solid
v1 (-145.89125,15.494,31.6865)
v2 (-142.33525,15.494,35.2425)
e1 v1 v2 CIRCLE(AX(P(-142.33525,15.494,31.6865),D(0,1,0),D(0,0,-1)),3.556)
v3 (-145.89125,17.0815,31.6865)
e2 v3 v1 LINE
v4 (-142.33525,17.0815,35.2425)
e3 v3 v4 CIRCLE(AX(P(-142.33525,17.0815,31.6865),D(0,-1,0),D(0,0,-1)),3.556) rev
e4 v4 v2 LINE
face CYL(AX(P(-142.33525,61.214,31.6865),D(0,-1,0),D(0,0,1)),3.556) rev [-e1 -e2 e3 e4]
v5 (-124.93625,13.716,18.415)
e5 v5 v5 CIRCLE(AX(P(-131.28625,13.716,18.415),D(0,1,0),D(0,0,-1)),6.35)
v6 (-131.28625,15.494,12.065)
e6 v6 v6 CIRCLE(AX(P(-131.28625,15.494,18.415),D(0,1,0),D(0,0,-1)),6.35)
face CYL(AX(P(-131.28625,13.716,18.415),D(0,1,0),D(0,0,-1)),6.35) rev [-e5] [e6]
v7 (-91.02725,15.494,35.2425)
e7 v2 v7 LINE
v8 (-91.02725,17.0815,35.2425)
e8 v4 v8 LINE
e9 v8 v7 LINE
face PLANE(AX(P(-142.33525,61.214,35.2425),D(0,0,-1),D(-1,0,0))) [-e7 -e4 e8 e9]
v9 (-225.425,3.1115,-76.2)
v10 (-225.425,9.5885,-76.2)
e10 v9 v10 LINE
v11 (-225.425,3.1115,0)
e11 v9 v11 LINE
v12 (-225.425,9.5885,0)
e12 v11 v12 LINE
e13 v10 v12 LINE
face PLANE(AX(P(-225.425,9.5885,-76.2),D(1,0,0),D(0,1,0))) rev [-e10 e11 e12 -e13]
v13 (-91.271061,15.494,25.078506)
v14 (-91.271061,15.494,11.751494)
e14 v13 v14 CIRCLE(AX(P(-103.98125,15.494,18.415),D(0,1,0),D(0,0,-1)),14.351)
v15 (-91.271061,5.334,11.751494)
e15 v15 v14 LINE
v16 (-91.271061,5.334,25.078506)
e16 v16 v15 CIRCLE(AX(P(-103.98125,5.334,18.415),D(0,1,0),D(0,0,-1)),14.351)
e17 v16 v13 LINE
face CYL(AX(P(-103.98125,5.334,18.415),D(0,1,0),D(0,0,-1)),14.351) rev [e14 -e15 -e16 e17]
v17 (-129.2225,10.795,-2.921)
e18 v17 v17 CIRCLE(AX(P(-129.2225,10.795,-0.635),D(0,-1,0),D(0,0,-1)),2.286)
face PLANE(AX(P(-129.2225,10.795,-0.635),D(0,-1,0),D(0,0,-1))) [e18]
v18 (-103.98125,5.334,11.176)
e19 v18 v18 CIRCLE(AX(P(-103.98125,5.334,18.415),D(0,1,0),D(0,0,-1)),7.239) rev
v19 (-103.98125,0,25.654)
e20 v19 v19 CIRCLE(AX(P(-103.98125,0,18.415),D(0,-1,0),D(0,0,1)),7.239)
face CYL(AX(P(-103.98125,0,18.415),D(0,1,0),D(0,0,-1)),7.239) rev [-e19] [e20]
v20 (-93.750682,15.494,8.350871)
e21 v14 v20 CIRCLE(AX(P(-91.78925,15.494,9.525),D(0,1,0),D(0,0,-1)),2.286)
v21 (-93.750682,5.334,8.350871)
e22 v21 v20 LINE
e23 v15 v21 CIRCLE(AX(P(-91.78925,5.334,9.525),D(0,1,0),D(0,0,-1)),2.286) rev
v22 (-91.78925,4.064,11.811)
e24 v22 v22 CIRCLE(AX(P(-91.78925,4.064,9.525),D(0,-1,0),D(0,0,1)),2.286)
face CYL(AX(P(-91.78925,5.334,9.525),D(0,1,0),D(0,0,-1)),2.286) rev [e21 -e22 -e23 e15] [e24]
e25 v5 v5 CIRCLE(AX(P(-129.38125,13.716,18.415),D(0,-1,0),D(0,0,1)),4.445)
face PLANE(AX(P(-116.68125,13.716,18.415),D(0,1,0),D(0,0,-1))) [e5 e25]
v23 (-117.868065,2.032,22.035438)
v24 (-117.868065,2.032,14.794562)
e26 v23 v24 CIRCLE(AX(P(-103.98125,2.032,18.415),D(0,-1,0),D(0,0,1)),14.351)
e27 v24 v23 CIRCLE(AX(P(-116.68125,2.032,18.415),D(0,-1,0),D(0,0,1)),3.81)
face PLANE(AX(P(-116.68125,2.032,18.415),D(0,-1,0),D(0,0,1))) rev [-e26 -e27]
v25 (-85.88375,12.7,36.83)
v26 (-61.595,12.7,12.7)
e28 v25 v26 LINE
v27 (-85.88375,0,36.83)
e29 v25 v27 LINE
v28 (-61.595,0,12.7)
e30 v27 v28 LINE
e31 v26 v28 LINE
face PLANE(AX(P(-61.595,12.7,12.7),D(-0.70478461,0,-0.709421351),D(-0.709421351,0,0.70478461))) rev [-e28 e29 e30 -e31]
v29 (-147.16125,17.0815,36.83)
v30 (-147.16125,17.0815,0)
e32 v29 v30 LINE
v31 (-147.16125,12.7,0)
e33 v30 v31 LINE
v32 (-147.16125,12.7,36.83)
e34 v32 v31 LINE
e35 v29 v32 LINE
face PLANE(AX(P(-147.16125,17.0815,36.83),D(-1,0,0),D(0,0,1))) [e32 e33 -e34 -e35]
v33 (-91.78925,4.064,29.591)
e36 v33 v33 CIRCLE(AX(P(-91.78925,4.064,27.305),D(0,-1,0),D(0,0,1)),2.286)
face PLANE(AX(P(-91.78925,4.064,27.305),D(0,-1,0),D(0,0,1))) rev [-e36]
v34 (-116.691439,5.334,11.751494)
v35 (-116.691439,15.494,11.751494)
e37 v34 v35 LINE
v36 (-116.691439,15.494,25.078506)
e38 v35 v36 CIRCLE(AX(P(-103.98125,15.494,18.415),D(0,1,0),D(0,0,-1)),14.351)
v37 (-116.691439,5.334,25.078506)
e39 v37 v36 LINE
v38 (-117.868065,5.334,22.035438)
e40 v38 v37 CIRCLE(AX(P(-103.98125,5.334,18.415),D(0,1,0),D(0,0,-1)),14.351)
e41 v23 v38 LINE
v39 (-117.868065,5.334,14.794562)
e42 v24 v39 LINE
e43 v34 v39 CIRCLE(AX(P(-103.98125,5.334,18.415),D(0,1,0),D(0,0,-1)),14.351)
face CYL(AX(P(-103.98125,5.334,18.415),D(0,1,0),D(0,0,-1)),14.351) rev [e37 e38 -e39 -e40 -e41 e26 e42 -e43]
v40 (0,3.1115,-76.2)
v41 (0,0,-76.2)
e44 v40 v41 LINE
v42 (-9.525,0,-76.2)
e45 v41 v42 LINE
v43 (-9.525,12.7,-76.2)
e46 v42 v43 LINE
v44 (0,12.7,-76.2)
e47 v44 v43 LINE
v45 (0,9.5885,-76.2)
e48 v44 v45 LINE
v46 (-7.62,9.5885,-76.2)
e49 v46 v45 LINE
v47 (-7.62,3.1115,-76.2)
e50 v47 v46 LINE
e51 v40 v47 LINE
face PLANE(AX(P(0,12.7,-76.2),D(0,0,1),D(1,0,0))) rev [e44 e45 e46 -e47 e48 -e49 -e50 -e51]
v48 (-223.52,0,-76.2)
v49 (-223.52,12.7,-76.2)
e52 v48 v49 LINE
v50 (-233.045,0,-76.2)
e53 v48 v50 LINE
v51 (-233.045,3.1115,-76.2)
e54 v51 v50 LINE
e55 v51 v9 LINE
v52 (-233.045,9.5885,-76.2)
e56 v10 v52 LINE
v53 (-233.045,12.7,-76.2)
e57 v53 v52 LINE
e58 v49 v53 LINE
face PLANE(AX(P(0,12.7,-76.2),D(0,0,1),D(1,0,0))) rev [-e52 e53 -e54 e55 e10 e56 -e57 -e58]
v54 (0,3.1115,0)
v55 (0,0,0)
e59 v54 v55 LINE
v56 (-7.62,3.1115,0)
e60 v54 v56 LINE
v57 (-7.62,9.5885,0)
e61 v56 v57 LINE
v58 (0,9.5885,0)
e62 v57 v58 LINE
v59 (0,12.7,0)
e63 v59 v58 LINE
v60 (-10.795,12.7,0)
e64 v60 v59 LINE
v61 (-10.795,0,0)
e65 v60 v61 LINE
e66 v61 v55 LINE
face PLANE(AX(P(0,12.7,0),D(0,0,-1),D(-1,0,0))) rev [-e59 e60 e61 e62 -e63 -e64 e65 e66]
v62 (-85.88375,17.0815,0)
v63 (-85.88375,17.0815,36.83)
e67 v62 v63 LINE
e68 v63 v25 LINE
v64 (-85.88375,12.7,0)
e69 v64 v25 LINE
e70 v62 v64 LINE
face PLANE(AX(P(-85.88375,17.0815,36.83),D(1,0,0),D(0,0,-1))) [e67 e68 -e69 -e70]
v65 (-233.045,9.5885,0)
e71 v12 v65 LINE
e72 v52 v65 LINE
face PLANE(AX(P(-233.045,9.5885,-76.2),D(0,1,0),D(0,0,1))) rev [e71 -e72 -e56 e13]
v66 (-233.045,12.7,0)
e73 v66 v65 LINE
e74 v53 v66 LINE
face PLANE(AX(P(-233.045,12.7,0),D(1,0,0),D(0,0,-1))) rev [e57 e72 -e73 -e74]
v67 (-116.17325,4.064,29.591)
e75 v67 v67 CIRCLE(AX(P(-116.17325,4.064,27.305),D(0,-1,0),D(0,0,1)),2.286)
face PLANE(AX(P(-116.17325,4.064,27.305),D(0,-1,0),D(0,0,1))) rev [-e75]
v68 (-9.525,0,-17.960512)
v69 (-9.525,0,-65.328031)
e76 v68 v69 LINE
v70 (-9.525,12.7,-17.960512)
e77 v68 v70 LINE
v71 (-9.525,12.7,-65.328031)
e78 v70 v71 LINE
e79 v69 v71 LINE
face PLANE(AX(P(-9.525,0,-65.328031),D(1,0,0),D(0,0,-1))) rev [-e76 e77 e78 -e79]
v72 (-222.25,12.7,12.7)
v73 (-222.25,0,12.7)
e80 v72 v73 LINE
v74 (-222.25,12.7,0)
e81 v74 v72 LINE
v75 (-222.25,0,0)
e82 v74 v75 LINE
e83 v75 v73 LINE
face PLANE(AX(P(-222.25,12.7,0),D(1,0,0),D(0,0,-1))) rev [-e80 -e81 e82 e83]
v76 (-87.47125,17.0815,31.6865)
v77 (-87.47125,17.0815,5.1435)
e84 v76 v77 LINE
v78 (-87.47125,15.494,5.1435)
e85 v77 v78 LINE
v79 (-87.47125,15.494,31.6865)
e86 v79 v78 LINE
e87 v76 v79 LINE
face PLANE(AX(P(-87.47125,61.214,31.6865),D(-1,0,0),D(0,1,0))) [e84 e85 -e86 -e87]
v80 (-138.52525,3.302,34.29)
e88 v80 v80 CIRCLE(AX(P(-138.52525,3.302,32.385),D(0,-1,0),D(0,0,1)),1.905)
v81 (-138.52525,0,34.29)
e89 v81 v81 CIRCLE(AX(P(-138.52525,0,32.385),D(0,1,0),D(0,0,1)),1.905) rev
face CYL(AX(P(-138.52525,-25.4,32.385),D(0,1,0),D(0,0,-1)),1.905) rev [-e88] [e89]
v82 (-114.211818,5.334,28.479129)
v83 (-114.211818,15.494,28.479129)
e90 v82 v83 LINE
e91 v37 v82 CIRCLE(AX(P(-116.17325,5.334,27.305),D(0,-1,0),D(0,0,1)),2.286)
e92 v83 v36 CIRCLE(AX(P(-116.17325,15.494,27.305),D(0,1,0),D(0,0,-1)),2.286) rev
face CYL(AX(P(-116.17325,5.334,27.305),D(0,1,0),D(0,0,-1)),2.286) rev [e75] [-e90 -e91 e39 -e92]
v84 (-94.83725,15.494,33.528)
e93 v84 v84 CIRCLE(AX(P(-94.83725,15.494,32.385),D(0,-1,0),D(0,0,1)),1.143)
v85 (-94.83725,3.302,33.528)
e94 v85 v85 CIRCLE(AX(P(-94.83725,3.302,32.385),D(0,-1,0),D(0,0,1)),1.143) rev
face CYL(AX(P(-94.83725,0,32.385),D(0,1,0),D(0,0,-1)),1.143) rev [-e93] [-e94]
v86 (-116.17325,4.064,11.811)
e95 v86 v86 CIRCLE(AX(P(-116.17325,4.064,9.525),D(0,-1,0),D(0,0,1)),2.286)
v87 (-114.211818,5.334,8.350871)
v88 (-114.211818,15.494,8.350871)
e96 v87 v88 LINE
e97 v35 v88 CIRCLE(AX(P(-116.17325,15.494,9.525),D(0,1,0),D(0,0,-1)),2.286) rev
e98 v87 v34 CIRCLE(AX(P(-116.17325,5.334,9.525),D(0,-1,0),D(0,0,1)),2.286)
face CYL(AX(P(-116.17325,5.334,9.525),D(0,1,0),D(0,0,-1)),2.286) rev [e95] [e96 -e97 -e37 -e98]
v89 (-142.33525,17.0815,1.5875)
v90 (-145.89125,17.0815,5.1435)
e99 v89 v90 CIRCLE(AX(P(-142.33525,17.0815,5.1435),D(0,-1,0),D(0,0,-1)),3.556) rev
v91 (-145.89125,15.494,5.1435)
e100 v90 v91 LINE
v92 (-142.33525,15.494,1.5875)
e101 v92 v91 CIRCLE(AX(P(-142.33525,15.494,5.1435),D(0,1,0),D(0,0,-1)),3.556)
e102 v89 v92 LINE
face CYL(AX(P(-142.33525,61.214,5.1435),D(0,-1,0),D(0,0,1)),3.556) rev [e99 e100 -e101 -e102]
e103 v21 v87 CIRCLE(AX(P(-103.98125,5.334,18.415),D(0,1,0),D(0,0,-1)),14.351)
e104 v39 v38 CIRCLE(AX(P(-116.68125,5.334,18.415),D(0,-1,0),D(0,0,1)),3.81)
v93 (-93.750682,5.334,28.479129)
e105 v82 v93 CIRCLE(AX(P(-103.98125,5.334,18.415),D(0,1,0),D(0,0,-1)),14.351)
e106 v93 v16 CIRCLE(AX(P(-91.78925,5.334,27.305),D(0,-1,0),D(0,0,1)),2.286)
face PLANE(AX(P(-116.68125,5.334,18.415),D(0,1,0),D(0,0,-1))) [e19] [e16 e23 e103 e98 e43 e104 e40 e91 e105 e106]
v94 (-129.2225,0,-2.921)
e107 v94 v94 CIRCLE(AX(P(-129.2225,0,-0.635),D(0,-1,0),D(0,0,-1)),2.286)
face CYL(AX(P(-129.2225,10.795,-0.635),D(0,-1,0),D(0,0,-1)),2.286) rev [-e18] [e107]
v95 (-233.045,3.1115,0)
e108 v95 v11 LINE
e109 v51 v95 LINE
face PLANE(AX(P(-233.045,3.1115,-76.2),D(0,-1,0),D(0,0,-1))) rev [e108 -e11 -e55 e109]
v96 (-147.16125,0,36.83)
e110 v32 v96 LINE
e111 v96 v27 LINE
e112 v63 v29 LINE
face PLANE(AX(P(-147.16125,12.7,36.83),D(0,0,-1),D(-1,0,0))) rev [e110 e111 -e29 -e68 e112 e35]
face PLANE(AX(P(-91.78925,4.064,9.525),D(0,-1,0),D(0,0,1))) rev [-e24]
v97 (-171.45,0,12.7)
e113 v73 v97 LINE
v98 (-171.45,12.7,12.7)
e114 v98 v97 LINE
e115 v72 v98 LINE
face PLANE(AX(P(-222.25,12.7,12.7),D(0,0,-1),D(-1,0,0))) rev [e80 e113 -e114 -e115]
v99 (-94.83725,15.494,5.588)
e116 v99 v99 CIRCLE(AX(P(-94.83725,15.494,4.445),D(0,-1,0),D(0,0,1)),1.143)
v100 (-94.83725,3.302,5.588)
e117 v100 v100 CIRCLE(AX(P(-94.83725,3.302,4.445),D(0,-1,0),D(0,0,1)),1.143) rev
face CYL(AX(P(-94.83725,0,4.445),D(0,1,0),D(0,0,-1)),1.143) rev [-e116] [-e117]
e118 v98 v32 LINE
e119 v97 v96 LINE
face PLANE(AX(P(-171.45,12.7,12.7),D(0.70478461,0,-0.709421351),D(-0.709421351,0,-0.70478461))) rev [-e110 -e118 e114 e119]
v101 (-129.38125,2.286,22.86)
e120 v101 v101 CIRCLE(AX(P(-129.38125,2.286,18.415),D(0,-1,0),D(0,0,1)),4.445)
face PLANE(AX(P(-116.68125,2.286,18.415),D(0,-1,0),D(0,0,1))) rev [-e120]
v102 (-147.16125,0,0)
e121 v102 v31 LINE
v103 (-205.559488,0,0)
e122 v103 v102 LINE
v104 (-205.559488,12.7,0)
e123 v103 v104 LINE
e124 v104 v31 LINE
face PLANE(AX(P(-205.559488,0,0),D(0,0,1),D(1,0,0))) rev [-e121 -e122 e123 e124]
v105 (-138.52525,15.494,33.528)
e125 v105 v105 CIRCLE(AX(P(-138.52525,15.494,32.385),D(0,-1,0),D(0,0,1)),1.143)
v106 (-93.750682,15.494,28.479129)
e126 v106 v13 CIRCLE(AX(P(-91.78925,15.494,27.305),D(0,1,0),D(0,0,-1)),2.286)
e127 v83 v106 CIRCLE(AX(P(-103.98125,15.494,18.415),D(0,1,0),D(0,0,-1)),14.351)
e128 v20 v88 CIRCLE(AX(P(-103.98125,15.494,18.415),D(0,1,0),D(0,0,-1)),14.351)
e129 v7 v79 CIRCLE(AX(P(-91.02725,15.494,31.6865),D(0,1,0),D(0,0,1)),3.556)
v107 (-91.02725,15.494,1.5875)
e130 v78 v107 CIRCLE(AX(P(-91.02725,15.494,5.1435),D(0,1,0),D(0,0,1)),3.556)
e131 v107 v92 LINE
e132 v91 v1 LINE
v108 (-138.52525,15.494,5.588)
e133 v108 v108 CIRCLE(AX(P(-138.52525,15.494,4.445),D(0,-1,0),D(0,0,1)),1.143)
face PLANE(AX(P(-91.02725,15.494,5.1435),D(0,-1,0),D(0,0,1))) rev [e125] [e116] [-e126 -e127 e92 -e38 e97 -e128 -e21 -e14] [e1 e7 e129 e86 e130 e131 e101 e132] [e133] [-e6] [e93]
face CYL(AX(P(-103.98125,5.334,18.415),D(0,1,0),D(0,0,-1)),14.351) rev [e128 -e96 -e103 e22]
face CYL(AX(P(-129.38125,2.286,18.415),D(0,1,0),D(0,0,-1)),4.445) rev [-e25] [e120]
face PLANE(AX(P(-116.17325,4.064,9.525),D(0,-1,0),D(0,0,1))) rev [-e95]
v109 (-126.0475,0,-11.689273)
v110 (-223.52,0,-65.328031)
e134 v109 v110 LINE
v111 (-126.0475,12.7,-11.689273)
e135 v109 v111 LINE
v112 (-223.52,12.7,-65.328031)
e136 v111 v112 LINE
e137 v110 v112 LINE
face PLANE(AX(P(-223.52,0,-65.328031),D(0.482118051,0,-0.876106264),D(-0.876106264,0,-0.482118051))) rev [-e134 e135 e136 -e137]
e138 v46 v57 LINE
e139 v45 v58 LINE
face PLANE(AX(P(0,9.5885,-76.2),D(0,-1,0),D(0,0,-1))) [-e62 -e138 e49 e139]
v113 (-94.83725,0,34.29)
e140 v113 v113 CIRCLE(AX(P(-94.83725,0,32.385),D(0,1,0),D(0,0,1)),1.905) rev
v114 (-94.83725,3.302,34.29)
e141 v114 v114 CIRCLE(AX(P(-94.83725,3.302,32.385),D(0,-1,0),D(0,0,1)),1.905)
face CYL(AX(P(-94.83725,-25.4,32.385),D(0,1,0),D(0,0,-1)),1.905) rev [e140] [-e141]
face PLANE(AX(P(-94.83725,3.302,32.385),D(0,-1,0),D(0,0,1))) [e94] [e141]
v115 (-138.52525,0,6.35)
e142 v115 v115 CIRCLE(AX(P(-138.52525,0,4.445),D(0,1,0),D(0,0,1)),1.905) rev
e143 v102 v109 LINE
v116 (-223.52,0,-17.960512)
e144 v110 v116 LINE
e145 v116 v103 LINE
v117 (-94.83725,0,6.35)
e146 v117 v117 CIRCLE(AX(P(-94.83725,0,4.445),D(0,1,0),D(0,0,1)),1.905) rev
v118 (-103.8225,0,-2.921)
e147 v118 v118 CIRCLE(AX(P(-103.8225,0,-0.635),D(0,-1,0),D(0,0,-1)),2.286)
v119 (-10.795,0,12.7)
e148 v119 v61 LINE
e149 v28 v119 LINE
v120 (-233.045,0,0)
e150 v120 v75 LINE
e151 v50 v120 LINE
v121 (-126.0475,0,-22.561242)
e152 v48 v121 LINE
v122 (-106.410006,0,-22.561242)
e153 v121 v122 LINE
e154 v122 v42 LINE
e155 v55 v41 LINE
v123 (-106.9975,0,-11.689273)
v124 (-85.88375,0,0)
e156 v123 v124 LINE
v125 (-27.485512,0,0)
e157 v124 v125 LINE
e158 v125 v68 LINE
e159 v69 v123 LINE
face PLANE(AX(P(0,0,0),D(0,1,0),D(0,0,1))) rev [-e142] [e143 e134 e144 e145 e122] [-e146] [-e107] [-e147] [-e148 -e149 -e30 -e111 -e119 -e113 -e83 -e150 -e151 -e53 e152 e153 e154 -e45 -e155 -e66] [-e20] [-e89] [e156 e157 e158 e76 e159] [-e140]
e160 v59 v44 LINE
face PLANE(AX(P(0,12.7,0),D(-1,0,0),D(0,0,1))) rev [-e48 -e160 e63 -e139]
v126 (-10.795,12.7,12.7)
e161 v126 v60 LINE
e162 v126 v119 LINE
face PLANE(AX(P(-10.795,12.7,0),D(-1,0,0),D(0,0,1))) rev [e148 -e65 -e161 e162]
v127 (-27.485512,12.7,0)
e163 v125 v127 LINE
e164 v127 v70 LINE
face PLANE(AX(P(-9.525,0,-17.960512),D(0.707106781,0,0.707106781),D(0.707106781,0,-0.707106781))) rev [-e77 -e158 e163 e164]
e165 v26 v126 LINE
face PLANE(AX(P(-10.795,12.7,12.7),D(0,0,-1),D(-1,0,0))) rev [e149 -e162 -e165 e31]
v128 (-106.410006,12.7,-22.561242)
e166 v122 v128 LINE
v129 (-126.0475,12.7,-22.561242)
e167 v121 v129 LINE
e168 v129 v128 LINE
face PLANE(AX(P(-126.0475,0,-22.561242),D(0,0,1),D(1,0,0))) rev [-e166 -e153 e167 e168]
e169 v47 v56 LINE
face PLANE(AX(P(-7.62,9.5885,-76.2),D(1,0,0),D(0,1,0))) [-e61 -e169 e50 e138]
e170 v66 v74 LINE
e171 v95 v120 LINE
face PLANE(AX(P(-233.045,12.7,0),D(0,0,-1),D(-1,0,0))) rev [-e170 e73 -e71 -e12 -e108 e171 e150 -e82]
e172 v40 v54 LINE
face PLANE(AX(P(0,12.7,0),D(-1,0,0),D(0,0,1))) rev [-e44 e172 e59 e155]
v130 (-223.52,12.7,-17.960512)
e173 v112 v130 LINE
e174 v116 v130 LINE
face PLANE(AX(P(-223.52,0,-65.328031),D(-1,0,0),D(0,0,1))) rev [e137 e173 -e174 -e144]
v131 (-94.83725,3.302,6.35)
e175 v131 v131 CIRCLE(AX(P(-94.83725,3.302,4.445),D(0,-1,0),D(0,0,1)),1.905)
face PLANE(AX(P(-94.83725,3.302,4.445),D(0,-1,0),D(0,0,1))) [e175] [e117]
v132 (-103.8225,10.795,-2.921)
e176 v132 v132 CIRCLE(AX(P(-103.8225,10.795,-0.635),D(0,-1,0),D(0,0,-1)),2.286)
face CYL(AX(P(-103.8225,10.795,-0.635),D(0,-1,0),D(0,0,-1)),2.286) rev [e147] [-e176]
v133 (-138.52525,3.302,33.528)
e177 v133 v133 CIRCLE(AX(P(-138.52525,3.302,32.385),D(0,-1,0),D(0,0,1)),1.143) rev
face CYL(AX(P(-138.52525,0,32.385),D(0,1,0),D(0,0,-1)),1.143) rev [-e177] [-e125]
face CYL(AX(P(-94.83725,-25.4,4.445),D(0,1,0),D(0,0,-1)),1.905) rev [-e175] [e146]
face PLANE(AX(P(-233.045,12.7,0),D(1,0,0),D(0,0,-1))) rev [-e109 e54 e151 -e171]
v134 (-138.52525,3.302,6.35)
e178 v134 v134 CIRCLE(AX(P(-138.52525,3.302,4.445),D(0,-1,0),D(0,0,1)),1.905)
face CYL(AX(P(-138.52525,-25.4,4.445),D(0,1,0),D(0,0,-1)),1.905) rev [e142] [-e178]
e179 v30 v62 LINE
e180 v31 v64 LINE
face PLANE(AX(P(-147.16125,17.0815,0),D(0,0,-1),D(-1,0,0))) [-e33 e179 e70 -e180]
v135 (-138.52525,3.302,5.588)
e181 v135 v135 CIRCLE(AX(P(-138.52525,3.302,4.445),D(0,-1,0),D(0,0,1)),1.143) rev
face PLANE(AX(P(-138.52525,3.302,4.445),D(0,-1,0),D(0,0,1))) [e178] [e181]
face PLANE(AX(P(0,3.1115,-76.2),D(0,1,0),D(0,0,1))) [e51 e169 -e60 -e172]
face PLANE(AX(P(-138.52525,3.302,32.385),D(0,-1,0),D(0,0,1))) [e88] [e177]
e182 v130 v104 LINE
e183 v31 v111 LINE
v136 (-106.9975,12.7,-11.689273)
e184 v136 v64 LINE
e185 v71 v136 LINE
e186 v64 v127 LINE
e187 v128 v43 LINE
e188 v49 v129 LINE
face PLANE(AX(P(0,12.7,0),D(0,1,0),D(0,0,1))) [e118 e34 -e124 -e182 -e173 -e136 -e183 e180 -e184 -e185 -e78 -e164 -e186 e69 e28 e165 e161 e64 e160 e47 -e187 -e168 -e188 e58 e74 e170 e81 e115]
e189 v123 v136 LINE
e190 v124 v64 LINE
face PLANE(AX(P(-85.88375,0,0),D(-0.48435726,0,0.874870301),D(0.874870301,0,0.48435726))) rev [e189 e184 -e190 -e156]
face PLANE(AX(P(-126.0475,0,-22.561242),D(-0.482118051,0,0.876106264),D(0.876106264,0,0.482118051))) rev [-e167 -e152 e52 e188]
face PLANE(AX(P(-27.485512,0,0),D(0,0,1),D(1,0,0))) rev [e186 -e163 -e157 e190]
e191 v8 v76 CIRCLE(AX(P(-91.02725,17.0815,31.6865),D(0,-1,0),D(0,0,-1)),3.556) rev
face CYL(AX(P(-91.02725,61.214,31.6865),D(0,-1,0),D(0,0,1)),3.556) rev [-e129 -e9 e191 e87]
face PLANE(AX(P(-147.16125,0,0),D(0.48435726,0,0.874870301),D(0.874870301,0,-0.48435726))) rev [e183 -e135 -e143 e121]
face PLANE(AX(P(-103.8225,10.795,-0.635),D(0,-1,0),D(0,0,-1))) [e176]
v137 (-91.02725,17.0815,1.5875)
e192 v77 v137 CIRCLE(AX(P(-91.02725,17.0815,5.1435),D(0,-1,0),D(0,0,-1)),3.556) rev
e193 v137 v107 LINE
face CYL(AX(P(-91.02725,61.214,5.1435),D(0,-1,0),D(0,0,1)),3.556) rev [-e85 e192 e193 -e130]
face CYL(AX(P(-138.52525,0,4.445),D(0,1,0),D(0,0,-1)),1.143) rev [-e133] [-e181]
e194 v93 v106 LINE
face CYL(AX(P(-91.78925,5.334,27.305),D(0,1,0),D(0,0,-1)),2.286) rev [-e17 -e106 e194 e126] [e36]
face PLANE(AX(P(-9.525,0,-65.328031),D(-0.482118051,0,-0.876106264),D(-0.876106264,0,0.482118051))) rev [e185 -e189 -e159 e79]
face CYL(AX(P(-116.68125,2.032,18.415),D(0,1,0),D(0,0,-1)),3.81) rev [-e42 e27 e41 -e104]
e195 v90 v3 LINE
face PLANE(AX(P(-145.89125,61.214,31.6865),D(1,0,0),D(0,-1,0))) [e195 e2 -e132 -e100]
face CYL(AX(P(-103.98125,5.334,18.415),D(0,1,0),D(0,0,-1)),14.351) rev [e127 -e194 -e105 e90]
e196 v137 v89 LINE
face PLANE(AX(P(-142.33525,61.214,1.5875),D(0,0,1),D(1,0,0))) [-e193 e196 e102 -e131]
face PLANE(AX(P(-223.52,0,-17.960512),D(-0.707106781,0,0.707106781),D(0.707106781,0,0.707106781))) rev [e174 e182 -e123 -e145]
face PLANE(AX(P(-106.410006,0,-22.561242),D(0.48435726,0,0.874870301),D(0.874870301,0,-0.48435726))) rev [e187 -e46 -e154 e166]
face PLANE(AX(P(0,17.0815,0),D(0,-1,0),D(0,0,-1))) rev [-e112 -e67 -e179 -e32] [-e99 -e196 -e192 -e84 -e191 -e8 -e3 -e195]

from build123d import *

# Parameters (mm, degrees)
BOSS_EXTRUDE1_DEPTH   = 12.7
CUT_EXTRUDE1_DEPTH    = 246.515176771
SKETCH3_W             = 7.62
SKETCH3_H             = 6.477
CUT_EXTRUDE2_DEPTH    = 246.515176771
SKETCH6_W             = 61.2775
SKETCH6_H             = 36.83
BOSS_EXTRUDE2_DEPTH   = 4.3815
CAVITY1_START         = 5.334
CAVITY1_OUTLINE_R     = 1.143
CAVITY1_OUTLINE_R_2   = 4.445
CAVITY1_DEPTH         = 11.7475
CAVITY1_START_2       = 15.494
CAVITY1_2_OUTLINE_R   = 1.143
CAVITY1_2_OUTLINE_R_2 = 4.445
CAVITY1_2_DEPTH       = 1.5875
CAVITY1_3_OUTLINE_R   = 1.143
CAVITY1_3_OUTLINE_R_2 = 7.239
CAVITY1_3_DEPTH       = 5.334
CAVITY1_START_3       = 2.286
CAVITY1_4_OUTLINE_R   = 4.445
CAVITY1_4_DEPTH       = 3.048
CAVITY1_START_4       = 13.716
CAVITY1_5_DEPTH       = 1.778
CAVITY1_6_OUTLINE_R   = 1.905
CAVITY1_6_OUTLINE_R_2 = 1.143
CAVITY1_6_DEPTH       = 3.302
CAVITY1_START_5       = 4.064
CAVITY1_7_OUTLINE_R   = 2.286
CAVITY1_7_DEPTH       = 1.27
CAVITY1_START_6       = 2.032
CAVITY1_8_DEPTH       = 0.254
SKETCH7_R             = 2.286
CUT_EXTRUDE4_DEPTH    = 10.795


# Read off the part's stored shape, not the designer's step: Cavity1
with BuildPart() as part:
    # Sketch1 → Boss-Extrude1 (new body)
    with BuildSketch(Plane(origin=(0, 0, 0), x_dir=(1, 0, 0), z_dir=(0, 1, 0))):
        Polygon((-233.045, 0), (-222.25, 0), (-222.25, -12.7), (-171.45, -12.7), (-147.16125, -36.83), (-85.88375, -36.83), (-61.595, -12.7), (-10.795, -12.7), (-10.795, 0), (0, 0), (0, 76.2), (-233.045, 76.2), align=None)
    extrude(amount=BOSS_EXTRUDE1_DEPTH)

    # Sketch2 → Cut-Extrude1 (cut, through all)
    with BuildSketch(Plane(origin=(0, 12.7, 0), x_dir=(1, 0, 0), z_dir=(0, 1, 0))):
        Polygon((-223.52, 76.2), (-9.525, 76.2), (-106.410006281, 22.561242197), (-126.0475, 22.561242197), align=None)
        Polygon((-223.52, 65.328031159), (-223.52, 17.960512242), (-205.559487758, 0), (-147.16125, 0), (-126.0475, 11.689273356), align=None)
        Polygon((-85.88375, 0), (-106.9975, 11.689273356), (-9.525, 65.328031159), (-9.525, 17.960512242), (-27.485512242, 0), align=None)
    extrude(amount=-CUT_EXTRUDE1_DEPTH, mode=Mode.SUBTRACT)

    # Sketch3 → Cut-Extrude2 (cut, through all)
    with BuildSketch(Plane.XY):
        with Locations((-229.235, 6.35)):
            Rectangle(SKETCH3_W, SKETCH3_H)
    cut_extrude2 = extrude(amount=-CUT_EXTRUDE2_DEPTH, mode=Mode.SUBTRACT)

    # Mirror1: Cut-Extrude2 across plane
    add(cut_extrude2.mirror(Plane.ZY.offset(116.5225)), mode=Mode.SUBTRACT)

    # Sketch6 → Boss-Extrude2 (add)
    with BuildSketch(Plane.XZ.offset(-12.7)):
        with Locations((-116.5225, 18.415)):
            Rectangle(SKETCH6_W, SKETCH6_H)
    extrude(amount=-BOSS_EXTRUDE2_DEPTH)

    # Cavity1 outline → Cavity1 (cut)
    with BuildSketch(Plane(origin=(0, 0, 0), x_dir=(1, 0, 0), z_dir=(0, 1, 0)).offset(CAVITY1_START)):
        with Locations((-138.52525, -4.445)):
            Circle(CAVITY1_OUTLINE_R)
        with Locations((-129.38125, -18.415)):
            Circle(CAVITY1_OUTLINE_R_2)
        with BuildLine():
            ThreePointArc((-116.691438518, -11.751494253), (-118.33225, -18.415), (-116.691438518, -25.078505747))
            ThreePointArc((-116.691438518, -25.078505747), (-118.020355214, -28.651847552), (-114.211817504, -28.479128852))
            ThreePointArc((-114.211817504, -28.479128852), (-103.98125, -32.766), (-93.750682496, -28.479128852))
            ThreePointArc((-93.750682496, -28.479128852), (-89.942144786, -28.651847552), (-91.271061482, -25.078505747))
            ThreePointArc((-91.271061482, -25.078505747), (-89.63025, -18.415), (-91.271061482, -11.751494253))
            ThreePointArc((-91.271061482, -11.751494253), (-89.942144786, -8.178152448), (-93.750682496, -8.350871148))
            ThreePointArc((-93.750682496, -8.350871148), (-103.98125, -4.064), (-114.211817504, -8.350871148))
            ThreePointArc((-114.211817504, -8.350871148), (-118.020355214, -8.178152448), (-116.691438518, -11.751494253))
        make_face()
        with Locations((-94.83725, -4.445)):
            Circle(CAVITY1_OUTLINE_R)
        with Locations((-138.52525, -32.385)):
            Circle(CAVITY1_OUTLINE_R)
        with Locations((-94.83725, -32.385)):
            Circle(CAVITY1_OUTLINE_R)
    extrude(amount=CAVITY1_DEPTH, mode=Mode.SUBTRACT)

    # Cavity1 2 outline → Cavity1 2 (cut)
    with BuildSketch(Plane(origin=(0, 0, 0), x_dir=(1, 0, 0), z_dir=(0, 1, 0)).offset(CAVITY1_START_2)):
        with BuildLine():
            ThreePointArc((-142.33525, -1.5875), (-144.849721714, -2.629028286), (-145.89125, -5.1435))
            Line((-145.89125, -5.1435), (-145.89125, -31.6865))
            ThreePointArc((-145.89125, -31.6865), (-144.849721714, -34.200971714), (-142.33525, -35.2425))
            Line((-142.33525, -35.2425), (-91.02725, -35.2425))
            ThreePointArc((-91.02725, -35.2425), (-88.512778286, -34.200971714), (-87.47125, -31.6865))
            Line((-87.47125, -31.6865), (-87.47125, -5.1435))
            ThreePointArc((-87.47125, -5.1435), (-88.512778286, -2.629028286), (-91.02725, -1.5875))
            Line((-91.02725, -1.5875), (-142.33525, -1.5875))
        make_face()
        with Locations((-138.52525, -4.445)):
            Circle(CAVITY1_2_OUTLINE_R, mode=Mode.SUBTRACT)
        with BuildLine():
            ThreePointArc((-114.211817504, -8.350871148), (-103.98125, -4.064), (-93.750682496, -8.350871148))
            ThreePointArc((-93.750682496, -8.350871148), (-89.942144786, -8.178152448), (-91.271061482, -11.751494253))
            ThreePointArc((-91.271061482, -11.751494253), (-89.63025, -18.415), (-91.271061482, -25.078505747))
            ThreePointArc((-91.271061482, -25.078505747), (-89.942144786, -28.651847552), (-93.750682496, -28.479128852))
            ThreePointArc((-93.750682496, -28.479128852), (-103.98125, -32.766), (-114.211817504, -28.479128852))
            ThreePointArc((-114.211817504, -28.479128852), (-118.020355214, -28.651847552), (-116.691438518, -25.078505747))
            ThreePointArc((-116.691438518, -25.078505747), (-118.33225, -18.415), (-116.691438518, -11.751494253))
            ThreePointArc((-116.691438518, -11.751494253), (-118.020355214, -8.178152448), (-114.211817504, -8.350871148))
        make_face(mode=Mode.SUBTRACT)
        with Locations((-129.38125, -18.415)):
            Circle(CAVITY1_2_OUTLINE_R_2, mode=Mode.SUBTRACT)
        with Locations((-94.83725, -4.445)):
            Circle(CAVITY1_2_OUTLINE_R, mode=Mode.SUBTRACT)
        with Locations((-138.52525, -32.385)):
            Circle(CAVITY1_2_OUTLINE_R, mode=Mode.SUBTRACT)
        with Locations((-94.83725, -32.385)):
            Circle(CAVITY1_2_OUTLINE_R, mode=Mode.SUBTRACT)
    extrude(amount=CAVITY1_2_DEPTH, mode=Mode.SUBTRACT)

    # Cavity1 3 outline → Cavity1 3 (cut)
    with BuildSketch(Plane(origin=(0, 0, 0), x_dir=(1, 0, 0), z_dir=(0, 1, 0))):
        with Locations((-138.52525, -4.445)):
            Circle(CAVITY1_3_OUTLINE_R)
        with Locations((-94.83725, -4.445)):
            Circle(CAVITY1_3_OUTLINE_R)
        with Locations((-138.52525, -32.385)):
            Circle(CAVITY1_3_OUTLINE_R)
        with Locations((-94.83725, -32.385)):
            Circle(CAVITY1_3_OUTLINE_R)
        with Locations((-103.98125, -18.415)):
            Circle(CAVITY1_3_OUTLINE_R_2)
    extrude(amount=CAVITY1_3_DEPTH, mode=Mode.SUBTRACT)

    # Cavity1 4 outline → Cavity1 4 (cut)
    with BuildSketch(Plane(origin=(0, 0, 0), x_dir=(1, 0, 0), z_dir=(0, 1, 0)).offset(CAVITY1_START_3)):
        with Locations((-129.38125, -18.415)):
            Circle(CAVITY1_4_OUTLINE_R)
        with BuildLine():
            ThreePointArc((-117.868065, -22.03543784), (-112.87125, -18.415), (-117.868065, -14.79456216))
            ThreePointArc((-117.868065, -14.79456216), (-118.33225, -18.415), (-117.868065, -22.03543784))
        make_face()
    extrude(amount=CAVITY1_4_DEPTH, mode=Mode.SUBTRACT)

    # Cavity1 5 outline → Cavity1 5 (cut)
    with BuildSketch(Plane(origin=(0, 0, 0), x_dir=(1, 0, 0), z_dir=(0, 1, 0)).offset(CAVITY1_START_4)):
        with BuildLine():
            Line((-128.370308668, -14.08648725), (-130.279975967, -12.145238237))
            ThreePointArc((-130.279975967, -12.145238237), (-134.269599777, -12.809455949), (-137.048919641, -15.747765737))
            Line((-137.048919641, -15.747765737), (-133.557318942, -16.89234666))
            ThreePointArc((-133.557318942, -16.89234666), (-131.4961306, -14.505357427), (-128.370308668, -14.08648725))
        make_face()
        with BuildLine():
            ThreePointArc((-125.062898336, -17.153099029), (-126.88891679, -13.833956381), (-130.279975967, -12.145238237))
            Line((-130.279975967, -12.145238237), (-128.370308668, -14.08648725))
            ThreePointArc((-128.370308668, -14.08648725), (-126.324912496, -15.187489185), (-125.114191907, -17.169913564))
            Line((-125.114191907, -17.169913564), (-125.062898336, -17.153099029))
        make_face()
        with BuildLine():
            ThreePointArc((-125.000827582, -17.511692175), (-125.02929351, -17.331950842), (-125.062898336, -17.153099029))
            Line((-125.062898336, -17.153099029), (-125.114191907, -17.169913564))
            ThreePointArc((-125.114191907, -17.169913564), (-125.072760846, -17.321864049), (-125.036738936, -17.475186925))
            Line((-125.036738936, -17.475186925), (-125.000827582, -17.511692175))
        make_face()
        with BuildLine():
            Line((-133.557318942, -16.89234666), (-137.048919641, -15.747765737))
            ThreePointArc((-137.048919641, -15.747765737), (-137.63625, -18.415), (-137.048919641, -21.082234263))
            Line((-137.048919641, -21.082234263), (-133.557318942, -19.93765334))
            ThreePointArc((-133.557318942, -19.93765334), (-133.82625, -18.415), (-133.557318942, -16.89234666))
        make_face()
        with BuildLine():
            ThreePointArc((-124.93625, -18.415), (-124.952414971, -17.962193393), (-125.000827582, -17.511692175))
            Line((-125.000827582, -17.511692175), (-125.036738936, -17.475186925))
            ThreePointArc((-125.036738936, -17.475186925), (-124.961443631, -17.942414917), (-124.93625, -18.415))
        make_face()
        with BuildLine():
            Line((-133.557318942, -19.93765334), (-137.048919641, -21.082234263))
            ThreePointArc((-137.048919641, -21.082234263), (-134.269599777, -24.020544051), (-130.279975966, -24.684761763))
            Line((-130.279975966, -24.684761763), (-128.370308667, -22.743512749))
            ThreePointArc((-128.370308667, -22.743512749), (-131.4961306, -22.324642573), (-133.557318942, -19.93765334))
        make_face()
        with BuildLine():
            ThreePointArc((-125.000827582, -19.318307826), (-124.952414971, -18.867806607), (-124.93625, -18.415))
            ThreePointArc((-124.93625, -18.415), (-124.961443631, -18.887585083), (-125.036738936, -19.354813075))
            Line((-125.036738936, -19.354813075), (-125.000827582, -19.318307826))
        make_face()
        with BuildLine():
            Line((-128.370308667, -22.743512749), (-130.279975966, -24.684761763))
            ThreePointArc((-130.279975966, -24.684761763), (-126.88891679, -22.996043619), (-125.062898336, -19.676900971))
            Line((-125.062898336, -19.676900971), (-125.114191907, -19.660086436))
            ThreePointArc((-125.114191907, -19.660086436), (-126.324912495, -21.642510815), (-128.370308667, -22.743512749))
        make_face()
        with BuildLine():
            ThreePointArc((-125.062898336, -19.676900971), (-125.02929351, -19.498049158), (-125.000827582, -19.318307826))
            Line((-125.000827582, -19.318307826), (-125.036738936, -19.354813075))
            ThreePointArc((-125.036738936, -19.354813075), (-125.072760846, -19.508135952), (-125.114191907, -19.660086436))
            Line((-125.114191907, -19.660086436), (-125.062898336, -19.676900971))
        make_face()
    extrude(amount=CAVITY1_5_DEPTH, mode=Mode.SUBTRACT)

    # Cavity1 6 outline → Cavity1 6 (cut)
    # profile 1 of 4: a face of its own
    with BuildSketch(Plane(origin=(0, 0, 0), x_dir=(1, 0, 0), z_dir=(0, 1, 0))):
        with Locations((-138.52525, -4.445)):
            Circle(CAVITY1_6_OUTLINE_R)
        with Locations((-138.52525, -4.445)):
            Circle(CAVITY1_6_OUTLINE_R_2, mode=Mode.SUBTRACT)
    # profile 2 of 4: a face of its own
    with BuildSketch(Plane(origin=(0, 0, 0), x_dir=(1, 0, 0), z_dir=(0, 1, 0))):
        with Locations((-94.83725, -4.445)):
            Circle(CAVITY1_6_OUTLINE_R)
        with Locations((-94.83725, -4.445)):
            Circle(CAVITY1_6_OUTLINE_R_2, mode=Mode.SUBTRACT)
    # profile 3 of 4: a face of its own
    with BuildSketch(Plane(origin=(0, 0, 0), x_dir=(1, 0, 0), z_dir=(0, 1, 0))):
        with Locations((-138.52525, -32.385)):
            Circle(CAVITY1_6_OUTLINE_R)
        with Locations((-138.52525, -32.385)):
            Circle(CAVITY1_6_OUTLINE_R_2, mode=Mode.SUBTRACT)
    # profile 4 of 4: a face of its own
    with BuildSketch(Plane(origin=(0, 0, 0), x_dir=(1, 0, 0), z_dir=(0, 1, 0))):
        with Locations((-94.83725, -32.385)):
            Circle(CAVITY1_6_OUTLINE_R)
        with Locations((-94.83725, -32.385)):
            Circle(CAVITY1_6_OUTLINE_R_2, mode=Mode.SUBTRACT)
    extrude(amount=CAVITY1_6_DEPTH, mode=Mode.SUBTRACT)

    # Cavity1 7 outline → Cavity1 7 (cut)
    with BuildSketch(Plane(origin=(0, 0, 0), x_dir=(1, 0, 0), z_dir=(0, 1, 0)).offset(CAVITY1_START_5)):
        with Locations((-116.17325, -9.525)):
            Circle(CAVITY1_7_OUTLINE_R)
        with Locations((-91.78925, -9.525)):
            Circle(CAVITY1_7_OUTLINE_R)
        with Locations((-116.17325, -27.305)):
            Circle(CAVITY1_7_OUTLINE_R)
        with Locations((-91.78925, -27.305)):
            Circle(CAVITY1_7_OUTLINE_R)
    extrude(amount=CAVITY1_7_DEPTH, mode=Mode.SUBTRACT)

    # Cavity1 8 outline → Cavity1 8 (cut)
    with BuildSketch(Plane(origin=(0, 0, 0), x_dir=(1, 0, 0), z_dir=(0, 1, 0)).offset(CAVITY1_START_6)):
        with BuildLine():
            ThreePointArc((-117.868065, -22.03543784), (-112.87125, -18.415), (-117.868065, -14.79456216))
            ThreePointArc((-117.868065, -14.79456216), (-118.33225, -18.415), (-117.868065, -22.03543784))
        make_face()
    extrude(amount=CAVITY1_8_DEPTH, mode=Mode.SUBTRACT)

    # Sketch7 → Cut-Extrude4 (cut)
    with BuildSketch(Plane.XZ):
        with Locations(Location((-103.8225, -0.635, 0), (0, 0, 270))):
            Circle(SKETCH7_R)
        with Locations(Location((-129.2225, -0.635, 0), (0, 0, 270))):
            Circle(SKETCH7_R)
    extrude(amount=-CUT_EXTRUDE4_DEPTH, mode=Mode.SUBTRACT)


solid = part.part
